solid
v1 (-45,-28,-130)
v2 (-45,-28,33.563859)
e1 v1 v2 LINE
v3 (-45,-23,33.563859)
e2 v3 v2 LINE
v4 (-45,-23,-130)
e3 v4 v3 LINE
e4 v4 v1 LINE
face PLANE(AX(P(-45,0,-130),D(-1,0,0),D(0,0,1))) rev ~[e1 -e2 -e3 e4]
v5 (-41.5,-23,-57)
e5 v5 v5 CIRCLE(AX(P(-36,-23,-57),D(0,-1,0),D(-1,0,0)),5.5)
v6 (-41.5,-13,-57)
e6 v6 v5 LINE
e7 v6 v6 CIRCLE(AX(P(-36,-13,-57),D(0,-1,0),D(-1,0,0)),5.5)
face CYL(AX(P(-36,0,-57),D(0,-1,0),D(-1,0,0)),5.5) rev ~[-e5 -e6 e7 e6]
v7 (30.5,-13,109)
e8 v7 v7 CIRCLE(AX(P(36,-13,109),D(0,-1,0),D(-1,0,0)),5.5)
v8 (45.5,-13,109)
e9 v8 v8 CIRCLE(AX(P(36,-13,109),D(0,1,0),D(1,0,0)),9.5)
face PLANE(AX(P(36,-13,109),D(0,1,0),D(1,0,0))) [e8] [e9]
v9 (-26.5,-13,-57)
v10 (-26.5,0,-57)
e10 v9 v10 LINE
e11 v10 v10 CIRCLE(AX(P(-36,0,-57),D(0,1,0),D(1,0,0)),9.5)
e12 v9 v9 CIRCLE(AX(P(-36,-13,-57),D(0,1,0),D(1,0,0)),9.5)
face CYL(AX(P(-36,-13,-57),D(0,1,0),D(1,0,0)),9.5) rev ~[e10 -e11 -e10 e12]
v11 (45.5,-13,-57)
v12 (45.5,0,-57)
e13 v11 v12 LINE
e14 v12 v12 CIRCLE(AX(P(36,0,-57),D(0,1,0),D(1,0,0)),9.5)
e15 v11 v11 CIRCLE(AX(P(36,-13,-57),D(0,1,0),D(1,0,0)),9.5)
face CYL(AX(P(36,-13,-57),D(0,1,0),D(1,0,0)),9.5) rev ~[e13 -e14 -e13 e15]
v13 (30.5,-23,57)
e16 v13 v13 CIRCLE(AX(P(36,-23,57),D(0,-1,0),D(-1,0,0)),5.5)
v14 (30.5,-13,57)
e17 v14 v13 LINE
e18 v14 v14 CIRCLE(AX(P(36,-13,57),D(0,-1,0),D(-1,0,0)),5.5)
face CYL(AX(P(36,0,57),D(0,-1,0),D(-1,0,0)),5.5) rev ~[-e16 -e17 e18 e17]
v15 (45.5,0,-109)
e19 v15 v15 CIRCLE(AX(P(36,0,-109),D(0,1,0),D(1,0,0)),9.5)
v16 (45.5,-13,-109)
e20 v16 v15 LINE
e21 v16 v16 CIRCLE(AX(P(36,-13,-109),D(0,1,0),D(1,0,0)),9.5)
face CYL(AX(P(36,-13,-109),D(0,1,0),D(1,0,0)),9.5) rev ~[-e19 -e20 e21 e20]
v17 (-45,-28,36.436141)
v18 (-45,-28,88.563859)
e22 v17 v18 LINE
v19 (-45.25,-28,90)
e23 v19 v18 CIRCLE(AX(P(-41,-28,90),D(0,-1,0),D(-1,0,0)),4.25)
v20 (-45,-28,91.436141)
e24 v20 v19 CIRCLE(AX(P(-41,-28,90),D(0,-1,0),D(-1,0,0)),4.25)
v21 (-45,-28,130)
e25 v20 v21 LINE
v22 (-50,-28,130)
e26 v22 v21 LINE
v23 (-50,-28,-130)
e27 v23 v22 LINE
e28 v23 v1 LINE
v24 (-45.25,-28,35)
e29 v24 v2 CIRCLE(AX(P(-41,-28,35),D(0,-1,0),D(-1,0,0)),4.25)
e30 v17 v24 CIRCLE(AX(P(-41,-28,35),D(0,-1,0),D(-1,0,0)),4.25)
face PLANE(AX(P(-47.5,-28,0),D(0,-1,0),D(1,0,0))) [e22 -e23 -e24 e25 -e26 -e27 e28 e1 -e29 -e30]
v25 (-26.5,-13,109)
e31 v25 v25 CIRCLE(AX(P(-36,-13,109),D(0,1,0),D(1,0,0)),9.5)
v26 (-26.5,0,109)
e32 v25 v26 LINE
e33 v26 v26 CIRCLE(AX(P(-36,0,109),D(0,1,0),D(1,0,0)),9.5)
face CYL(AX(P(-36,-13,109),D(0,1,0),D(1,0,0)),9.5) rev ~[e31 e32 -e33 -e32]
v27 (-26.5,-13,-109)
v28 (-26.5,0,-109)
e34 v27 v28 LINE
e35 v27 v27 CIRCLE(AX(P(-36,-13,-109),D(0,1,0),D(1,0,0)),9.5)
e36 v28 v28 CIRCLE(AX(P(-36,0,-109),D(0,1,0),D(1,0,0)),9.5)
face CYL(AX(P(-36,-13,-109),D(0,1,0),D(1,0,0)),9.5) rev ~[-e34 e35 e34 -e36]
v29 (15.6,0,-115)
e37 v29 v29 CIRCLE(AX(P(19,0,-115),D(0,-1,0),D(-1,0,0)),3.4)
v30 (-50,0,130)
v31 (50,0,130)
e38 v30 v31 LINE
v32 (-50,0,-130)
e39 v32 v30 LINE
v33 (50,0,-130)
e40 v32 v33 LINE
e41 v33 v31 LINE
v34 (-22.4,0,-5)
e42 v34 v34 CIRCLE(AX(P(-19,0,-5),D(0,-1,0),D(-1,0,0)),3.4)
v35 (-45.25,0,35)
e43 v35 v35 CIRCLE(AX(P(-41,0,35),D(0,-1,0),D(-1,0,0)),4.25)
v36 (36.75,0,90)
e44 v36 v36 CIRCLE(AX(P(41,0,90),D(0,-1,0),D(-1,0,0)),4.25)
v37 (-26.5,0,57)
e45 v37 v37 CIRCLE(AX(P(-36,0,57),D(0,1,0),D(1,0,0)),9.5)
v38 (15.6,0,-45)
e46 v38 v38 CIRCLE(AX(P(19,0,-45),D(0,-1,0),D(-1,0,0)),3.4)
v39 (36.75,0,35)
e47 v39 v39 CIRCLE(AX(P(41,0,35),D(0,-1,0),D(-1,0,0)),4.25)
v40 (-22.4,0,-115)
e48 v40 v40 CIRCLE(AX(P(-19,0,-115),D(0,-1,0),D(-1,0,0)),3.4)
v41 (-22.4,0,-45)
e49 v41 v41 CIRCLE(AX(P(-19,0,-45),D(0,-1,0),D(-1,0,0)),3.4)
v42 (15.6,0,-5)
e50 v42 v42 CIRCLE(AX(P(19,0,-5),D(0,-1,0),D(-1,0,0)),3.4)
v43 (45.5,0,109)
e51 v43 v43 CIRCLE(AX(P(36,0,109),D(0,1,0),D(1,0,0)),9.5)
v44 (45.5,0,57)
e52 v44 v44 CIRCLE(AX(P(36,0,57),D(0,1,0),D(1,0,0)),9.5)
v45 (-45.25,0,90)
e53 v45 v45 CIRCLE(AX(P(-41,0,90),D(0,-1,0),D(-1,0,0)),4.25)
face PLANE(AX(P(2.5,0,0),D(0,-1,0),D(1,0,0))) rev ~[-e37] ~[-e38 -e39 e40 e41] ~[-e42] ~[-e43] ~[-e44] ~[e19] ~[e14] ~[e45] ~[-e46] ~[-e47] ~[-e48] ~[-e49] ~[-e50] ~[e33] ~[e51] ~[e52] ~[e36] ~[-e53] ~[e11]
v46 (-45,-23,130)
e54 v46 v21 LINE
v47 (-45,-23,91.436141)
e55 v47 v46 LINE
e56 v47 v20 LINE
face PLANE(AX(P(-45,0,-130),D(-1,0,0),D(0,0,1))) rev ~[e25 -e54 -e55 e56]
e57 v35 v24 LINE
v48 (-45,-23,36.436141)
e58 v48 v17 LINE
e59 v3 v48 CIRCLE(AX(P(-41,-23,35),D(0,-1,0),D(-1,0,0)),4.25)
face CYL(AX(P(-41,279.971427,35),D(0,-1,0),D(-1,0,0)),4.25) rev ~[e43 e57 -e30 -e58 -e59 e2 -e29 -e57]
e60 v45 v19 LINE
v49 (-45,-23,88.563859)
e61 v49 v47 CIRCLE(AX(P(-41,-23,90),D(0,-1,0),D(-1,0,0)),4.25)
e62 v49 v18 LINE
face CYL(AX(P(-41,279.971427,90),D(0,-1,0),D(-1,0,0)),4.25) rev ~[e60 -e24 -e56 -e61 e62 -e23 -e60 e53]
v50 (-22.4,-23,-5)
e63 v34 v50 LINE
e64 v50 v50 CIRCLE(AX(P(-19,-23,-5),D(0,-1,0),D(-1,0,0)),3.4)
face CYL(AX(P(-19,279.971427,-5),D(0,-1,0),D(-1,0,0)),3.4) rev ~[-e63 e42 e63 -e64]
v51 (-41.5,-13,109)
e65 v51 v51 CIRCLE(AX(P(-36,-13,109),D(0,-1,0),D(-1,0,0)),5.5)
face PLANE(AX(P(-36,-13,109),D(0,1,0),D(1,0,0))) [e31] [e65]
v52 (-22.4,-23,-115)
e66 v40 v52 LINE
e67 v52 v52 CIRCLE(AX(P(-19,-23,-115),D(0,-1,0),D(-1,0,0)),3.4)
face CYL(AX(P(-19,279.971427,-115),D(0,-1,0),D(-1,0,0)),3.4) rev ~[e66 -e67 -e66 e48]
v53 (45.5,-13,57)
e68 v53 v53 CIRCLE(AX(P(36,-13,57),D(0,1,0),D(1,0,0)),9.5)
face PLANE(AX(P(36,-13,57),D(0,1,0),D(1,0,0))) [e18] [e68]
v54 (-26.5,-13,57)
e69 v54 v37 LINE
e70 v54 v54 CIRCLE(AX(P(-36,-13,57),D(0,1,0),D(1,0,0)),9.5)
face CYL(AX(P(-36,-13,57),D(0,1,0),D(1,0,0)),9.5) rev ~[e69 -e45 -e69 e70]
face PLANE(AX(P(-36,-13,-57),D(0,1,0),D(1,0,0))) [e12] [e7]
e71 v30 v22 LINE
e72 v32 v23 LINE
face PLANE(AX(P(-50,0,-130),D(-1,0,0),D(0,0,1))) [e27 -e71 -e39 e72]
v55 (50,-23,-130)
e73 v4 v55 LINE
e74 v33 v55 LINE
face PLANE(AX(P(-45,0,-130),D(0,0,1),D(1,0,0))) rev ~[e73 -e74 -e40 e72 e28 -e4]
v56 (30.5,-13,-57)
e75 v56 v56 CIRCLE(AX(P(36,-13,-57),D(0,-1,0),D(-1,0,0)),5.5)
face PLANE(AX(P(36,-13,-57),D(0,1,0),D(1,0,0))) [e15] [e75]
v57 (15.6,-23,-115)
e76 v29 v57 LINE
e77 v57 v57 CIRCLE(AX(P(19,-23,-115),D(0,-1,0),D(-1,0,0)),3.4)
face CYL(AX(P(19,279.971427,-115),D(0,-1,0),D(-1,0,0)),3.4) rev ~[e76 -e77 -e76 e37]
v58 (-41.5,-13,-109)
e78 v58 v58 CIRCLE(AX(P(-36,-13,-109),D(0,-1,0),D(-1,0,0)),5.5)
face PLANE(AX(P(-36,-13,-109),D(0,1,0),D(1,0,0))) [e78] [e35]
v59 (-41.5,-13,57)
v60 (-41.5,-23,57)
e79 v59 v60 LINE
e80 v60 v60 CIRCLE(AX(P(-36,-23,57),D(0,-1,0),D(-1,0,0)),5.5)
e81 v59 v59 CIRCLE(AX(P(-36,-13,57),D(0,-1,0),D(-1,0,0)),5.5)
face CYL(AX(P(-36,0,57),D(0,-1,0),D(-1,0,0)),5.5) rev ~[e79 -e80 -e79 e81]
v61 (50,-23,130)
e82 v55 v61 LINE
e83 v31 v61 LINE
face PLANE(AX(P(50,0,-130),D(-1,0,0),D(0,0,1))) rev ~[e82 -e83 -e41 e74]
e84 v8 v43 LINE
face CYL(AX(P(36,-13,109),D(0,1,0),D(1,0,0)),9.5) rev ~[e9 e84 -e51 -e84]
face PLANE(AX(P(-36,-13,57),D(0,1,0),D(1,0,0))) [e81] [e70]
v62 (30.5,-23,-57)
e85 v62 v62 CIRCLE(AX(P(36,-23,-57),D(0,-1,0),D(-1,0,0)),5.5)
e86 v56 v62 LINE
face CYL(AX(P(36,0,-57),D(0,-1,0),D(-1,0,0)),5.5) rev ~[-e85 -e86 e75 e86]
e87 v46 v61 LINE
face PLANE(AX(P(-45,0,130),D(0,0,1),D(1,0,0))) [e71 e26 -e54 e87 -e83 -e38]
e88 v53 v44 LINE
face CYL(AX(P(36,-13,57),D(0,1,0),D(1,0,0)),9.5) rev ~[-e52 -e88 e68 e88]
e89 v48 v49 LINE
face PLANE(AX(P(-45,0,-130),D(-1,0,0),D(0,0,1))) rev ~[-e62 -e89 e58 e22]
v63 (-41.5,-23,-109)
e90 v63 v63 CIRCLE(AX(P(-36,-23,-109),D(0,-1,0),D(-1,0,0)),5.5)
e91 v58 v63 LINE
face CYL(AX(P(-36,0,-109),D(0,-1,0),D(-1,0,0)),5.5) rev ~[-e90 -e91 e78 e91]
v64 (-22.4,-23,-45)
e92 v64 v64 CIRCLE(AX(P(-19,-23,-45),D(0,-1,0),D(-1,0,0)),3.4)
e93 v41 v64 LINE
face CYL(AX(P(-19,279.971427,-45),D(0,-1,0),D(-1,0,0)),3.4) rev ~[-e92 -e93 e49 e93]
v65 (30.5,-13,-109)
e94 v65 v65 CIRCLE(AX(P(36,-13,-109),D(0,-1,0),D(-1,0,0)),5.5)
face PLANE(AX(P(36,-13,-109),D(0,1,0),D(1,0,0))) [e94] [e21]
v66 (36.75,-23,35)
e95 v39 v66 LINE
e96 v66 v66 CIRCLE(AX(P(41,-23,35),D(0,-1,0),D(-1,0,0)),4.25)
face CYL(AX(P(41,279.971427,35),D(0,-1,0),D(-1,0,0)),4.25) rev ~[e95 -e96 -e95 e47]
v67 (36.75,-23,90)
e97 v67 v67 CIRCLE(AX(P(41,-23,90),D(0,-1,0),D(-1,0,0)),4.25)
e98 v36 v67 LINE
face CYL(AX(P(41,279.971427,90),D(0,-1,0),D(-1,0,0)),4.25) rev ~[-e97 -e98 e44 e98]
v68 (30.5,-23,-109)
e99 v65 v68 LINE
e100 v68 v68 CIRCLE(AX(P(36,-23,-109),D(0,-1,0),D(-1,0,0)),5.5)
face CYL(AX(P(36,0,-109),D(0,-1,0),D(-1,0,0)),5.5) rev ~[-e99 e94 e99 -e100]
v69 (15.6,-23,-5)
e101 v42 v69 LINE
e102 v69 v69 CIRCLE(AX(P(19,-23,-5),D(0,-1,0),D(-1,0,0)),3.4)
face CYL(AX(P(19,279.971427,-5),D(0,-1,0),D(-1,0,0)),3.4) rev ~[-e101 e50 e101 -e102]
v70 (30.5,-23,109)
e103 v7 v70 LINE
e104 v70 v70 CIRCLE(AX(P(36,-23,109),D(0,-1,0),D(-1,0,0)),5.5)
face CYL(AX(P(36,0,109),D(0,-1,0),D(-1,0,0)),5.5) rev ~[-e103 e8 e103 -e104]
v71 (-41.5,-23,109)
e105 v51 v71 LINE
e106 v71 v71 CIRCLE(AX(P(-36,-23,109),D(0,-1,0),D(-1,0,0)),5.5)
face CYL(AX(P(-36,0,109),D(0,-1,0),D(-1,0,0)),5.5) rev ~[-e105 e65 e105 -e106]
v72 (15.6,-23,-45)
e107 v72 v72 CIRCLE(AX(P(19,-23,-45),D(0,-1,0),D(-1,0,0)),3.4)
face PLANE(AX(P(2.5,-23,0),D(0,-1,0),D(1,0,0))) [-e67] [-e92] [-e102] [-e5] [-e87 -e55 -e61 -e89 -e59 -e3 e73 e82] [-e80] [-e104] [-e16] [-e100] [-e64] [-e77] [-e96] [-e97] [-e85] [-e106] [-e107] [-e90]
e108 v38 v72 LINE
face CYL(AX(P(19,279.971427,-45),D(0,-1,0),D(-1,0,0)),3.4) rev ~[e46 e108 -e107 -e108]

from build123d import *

# Parameters (mm, degrees)
F0_W           = 5
F0_H           = 260
F1_DEPTH       = 28
F0_W_2         = 95
F2_DEPTH       = 23
F3_D           = 8.5
F4_D           = 6.8
F5_D           = 11
F5_CBORE_D     = 19
F5_CBORE_DEPTH = 13


# Not quite as in the source:
# - a feature names something its author has since deleted; it is built from what else it names


with BuildPart() as f1:
    # F0 (on Front) → F1 (new body)
    with BuildSketch(Plane.XZ):
        with Locations((-47.5, 0)):
            Rectangle(F0_W, F0_H)
    extrude(amount=F1_DEPTH)

    # F0 (on Front) → F2 (join)
    with BuildSketch(Plane.XZ):
        with Locations((2.5, 0)):
            Rectangle(F0_W_2, F0_H)
    extrude(amount=F2_DEPTH)

    # F3 (through all)
    with Locations(Plane(origin=(0, 0, 0), x_dir=(1, 0, 0), z_dir=(0, 1, 0))):
        with Locations((41, -90), (-41, -90), (41, -35), (-41, -35)):
            Hole(F3_D / 2)

    # F4 (through all)
    with Locations(Plane(origin=(0, 0, 0), x_dir=(1, 0, 0), z_dir=(0, 1, 0))):
        with Locations((19, 5), (-19, 5), (19, 45), (-19, 45), (19, 115), (-19, 115)):
            Hole(F4_D / 2)

    # F5 (through all)
    with Locations(Plane(origin=(0, 0, 0), x_dir=(1, 0, 0), z_dir=(0, 1, 0))):
        with Locations((36, -109), (-36, -109), (36, -57), (-36, -57), (36, 57), (-36, 57), (-36, 109), (36, 109)):
            CounterBoreHole(F5_D / 2, F5_CBORE_D / 2, F5_CBORE_DEPTH)


solid = f1.part
